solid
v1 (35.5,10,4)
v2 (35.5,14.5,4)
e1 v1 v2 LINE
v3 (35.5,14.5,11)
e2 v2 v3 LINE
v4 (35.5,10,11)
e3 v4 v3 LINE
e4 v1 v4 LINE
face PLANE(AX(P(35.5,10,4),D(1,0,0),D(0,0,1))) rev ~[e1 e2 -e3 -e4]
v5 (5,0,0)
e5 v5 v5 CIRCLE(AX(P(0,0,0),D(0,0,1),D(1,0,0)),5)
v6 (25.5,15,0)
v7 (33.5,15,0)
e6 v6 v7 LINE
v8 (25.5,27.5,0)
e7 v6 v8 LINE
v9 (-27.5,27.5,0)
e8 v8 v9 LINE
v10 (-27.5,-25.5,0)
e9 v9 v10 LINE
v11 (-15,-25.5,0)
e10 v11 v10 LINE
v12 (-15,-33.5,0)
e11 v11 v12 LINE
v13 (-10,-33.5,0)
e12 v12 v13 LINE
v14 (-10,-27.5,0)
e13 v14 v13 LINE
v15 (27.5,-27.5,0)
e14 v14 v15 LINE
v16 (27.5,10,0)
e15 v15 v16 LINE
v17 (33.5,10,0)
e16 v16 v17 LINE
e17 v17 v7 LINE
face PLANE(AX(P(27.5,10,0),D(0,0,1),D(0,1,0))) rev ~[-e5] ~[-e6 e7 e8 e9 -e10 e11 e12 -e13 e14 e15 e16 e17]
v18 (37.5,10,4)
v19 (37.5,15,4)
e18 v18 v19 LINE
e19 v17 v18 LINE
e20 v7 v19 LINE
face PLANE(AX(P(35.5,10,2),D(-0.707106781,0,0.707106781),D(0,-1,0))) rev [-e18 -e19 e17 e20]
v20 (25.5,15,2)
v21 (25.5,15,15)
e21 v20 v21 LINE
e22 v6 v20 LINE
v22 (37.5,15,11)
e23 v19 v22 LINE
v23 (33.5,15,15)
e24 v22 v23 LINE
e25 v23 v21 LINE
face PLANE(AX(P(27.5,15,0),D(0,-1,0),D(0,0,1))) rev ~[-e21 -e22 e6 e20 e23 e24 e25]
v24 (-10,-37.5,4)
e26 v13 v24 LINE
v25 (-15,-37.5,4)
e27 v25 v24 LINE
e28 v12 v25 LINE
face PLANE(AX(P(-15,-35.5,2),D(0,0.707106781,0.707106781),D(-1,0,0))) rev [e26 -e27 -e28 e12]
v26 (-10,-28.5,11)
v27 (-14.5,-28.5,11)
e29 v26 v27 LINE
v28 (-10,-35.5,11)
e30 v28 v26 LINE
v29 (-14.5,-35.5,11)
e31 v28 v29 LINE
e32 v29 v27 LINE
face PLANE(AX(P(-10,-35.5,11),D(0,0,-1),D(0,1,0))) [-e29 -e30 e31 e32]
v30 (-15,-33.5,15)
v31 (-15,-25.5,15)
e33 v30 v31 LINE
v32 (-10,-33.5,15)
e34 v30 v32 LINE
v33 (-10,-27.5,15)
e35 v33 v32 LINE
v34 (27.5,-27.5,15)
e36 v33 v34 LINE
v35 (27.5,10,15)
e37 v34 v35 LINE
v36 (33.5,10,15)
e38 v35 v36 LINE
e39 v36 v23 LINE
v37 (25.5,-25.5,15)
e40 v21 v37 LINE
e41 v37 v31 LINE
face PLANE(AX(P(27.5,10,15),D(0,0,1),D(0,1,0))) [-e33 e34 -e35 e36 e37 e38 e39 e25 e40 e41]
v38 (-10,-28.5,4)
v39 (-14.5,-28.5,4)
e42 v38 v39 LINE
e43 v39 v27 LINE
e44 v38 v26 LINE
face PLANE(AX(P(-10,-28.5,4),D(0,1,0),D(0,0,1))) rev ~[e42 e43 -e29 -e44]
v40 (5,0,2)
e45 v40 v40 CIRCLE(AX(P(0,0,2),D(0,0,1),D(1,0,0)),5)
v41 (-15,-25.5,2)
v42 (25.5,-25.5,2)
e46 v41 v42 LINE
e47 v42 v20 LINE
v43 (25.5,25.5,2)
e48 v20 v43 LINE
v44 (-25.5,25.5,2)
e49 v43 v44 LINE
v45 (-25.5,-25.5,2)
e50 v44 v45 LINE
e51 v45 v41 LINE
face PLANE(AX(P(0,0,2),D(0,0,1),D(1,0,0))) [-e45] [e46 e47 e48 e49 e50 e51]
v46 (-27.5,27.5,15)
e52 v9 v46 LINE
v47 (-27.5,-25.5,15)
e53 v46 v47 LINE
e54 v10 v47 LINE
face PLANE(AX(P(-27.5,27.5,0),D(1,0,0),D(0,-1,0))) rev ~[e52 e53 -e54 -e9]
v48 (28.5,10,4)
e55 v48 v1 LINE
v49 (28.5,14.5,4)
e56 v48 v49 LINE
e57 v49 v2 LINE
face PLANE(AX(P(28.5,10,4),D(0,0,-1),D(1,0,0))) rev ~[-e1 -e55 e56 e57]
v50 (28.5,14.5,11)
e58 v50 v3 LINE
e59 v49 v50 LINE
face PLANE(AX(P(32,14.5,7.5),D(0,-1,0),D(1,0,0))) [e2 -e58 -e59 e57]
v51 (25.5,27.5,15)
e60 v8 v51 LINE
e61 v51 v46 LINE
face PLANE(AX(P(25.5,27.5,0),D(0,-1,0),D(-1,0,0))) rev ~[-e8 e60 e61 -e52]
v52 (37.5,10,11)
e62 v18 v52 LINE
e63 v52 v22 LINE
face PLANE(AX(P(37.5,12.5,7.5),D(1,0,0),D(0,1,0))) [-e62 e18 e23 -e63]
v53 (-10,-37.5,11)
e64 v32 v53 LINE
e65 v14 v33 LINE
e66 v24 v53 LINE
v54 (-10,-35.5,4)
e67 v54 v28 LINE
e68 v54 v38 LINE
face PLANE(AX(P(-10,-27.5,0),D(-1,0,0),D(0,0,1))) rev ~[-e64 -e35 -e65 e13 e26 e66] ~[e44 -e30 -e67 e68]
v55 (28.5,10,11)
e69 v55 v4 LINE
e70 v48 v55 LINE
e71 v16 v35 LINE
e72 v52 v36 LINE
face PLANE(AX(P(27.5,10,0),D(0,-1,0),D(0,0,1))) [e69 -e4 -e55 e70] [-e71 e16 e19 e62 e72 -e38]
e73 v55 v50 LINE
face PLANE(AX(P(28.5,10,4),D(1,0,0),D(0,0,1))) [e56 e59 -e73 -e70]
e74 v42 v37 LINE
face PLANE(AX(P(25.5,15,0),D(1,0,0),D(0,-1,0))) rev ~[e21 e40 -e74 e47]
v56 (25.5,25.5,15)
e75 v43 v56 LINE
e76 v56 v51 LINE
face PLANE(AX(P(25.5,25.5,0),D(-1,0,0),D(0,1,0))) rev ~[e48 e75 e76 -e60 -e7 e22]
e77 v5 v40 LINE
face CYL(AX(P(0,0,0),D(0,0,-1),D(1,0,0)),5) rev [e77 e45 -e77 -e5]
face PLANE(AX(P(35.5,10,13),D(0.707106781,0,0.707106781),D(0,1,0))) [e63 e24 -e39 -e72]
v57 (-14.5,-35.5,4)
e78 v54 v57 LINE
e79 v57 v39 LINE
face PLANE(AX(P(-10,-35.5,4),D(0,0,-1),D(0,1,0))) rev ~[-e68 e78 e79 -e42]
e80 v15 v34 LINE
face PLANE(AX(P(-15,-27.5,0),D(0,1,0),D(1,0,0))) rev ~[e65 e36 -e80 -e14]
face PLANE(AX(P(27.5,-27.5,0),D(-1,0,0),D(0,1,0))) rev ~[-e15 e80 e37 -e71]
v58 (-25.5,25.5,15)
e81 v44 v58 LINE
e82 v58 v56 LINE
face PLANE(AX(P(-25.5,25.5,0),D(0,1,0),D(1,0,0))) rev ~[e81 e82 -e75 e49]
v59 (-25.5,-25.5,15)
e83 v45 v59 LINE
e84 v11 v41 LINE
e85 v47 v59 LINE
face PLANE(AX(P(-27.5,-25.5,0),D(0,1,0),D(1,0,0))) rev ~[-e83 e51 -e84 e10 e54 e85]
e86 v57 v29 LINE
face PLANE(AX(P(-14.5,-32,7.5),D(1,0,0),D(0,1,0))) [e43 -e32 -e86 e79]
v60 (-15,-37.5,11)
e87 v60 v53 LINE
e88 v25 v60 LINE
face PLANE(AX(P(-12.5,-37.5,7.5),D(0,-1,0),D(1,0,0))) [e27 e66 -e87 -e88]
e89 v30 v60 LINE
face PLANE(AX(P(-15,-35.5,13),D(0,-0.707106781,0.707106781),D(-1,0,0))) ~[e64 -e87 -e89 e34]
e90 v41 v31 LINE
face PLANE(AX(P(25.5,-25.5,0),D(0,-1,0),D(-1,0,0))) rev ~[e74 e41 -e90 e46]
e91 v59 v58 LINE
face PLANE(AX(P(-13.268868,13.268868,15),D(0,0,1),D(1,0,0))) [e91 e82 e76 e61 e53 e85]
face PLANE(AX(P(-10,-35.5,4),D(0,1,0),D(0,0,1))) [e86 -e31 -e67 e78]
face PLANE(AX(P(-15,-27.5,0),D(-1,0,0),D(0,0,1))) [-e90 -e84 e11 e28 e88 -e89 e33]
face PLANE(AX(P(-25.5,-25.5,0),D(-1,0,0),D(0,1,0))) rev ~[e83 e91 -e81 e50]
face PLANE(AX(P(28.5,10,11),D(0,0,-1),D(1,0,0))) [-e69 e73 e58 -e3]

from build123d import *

# Parameters (mm, degrees)
F0_R      = 5
F1_DEPTH  = 2
F2_DEPTH  = 15
F3_W      = 5
F3_H      = 15
F4_DEPTH  = 10
F5_SIZE   = 4
F6_W      = 7
F6_H      = 7
F7_DEPTH  = 4.5
F8_W      = 5
F8_H      = 15
F9_DEPTH  = 10
F10_W     = 7
F10_H     = 7
F11_DEPTH = 4.5
F12_SIZE  = 4


with BuildPart() as f1:
    # F0 (on Top) → F1 (new body)
    with BuildSketch(Plane.XY):
        Polygon((25.5, 17.5), (25.5, 25.5), (-25.5, 25.5), (-25.5, -25.5), (-17.5, -25.5), (-15, -25.5), (25.5, -25.5), (25.5, 15), align=None)
        Circle(F0_R, mode=Mode.SUBTRACT)
    extrude(amount=F1_DEPTH)

    # F0 (on Top) → F2 (join)
    with BuildSketch(Plane.XY):
        Polygon((25.5, 27.5), (-27.5, 27.5), (-27.5, -25.5), (-25.5, -25.5), (-25.5, 25.5), (25.5, 25.5), align=None)
        Polygon((27.5, -27.5), (27.5, 15), (25.5, 15), (25.5, -25.5), (-15, -25.5), (-15, -27.5), align=None)
    extrude(amount=F2_DEPTH)

    # F3 (on face) → F4 (join)
    with BuildSketch(Plane.XZ.offset(27.5)):
        with Locations((-12.5, 7.5)):
            Rectangle(F3_W, F3_H)
    extrude(amount=F4_DEPTH)

    # F5
    f5_edges = [f1.edges().sort_by_distance(p)[0] for p in [
        (-12.5, -37.5, 15),
        (-12.5, -37.5, 0),
    ]]
    chamfer(f5_edges, length=F5_SIZE)

    # F6 (on face) → F7 (cut)
    with BuildSketch(Plane.YZ.offset(-10)):
        with Locations((-32, 7.5)):
            Rectangle(F6_W, F6_H)
    extrude(amount=-F7_DEPTH, mode=Mode.SUBTRACT)

    # F8 (on face) → F9 (join)
    with BuildSketch(Plane.YZ.offset(27.5)):
        with Locations((12.5, 7.5)):
            Rectangle(F8_W, F8_H)
    extrude(amount=F9_DEPTH)

    # F10 (on face) → F11 (cut)
    with BuildSketch(Plane.XZ.offset(-10)):
        with Locations((32, 7.5)):
            Rectangle(F10_W, F10_H)
    extrude(amount=-F11_DEPTH, mode=Mode.SUBTRACT)

    # F12
    f12_edges = [f1.edges().sort_by_distance(p)[0] for p in [
        (37.5, 12.5, 15),
        (37.5, 12.5, 0),
    ]]
    chamfer(f12_edges, length=F12_SIZE)


solid = f1.part
